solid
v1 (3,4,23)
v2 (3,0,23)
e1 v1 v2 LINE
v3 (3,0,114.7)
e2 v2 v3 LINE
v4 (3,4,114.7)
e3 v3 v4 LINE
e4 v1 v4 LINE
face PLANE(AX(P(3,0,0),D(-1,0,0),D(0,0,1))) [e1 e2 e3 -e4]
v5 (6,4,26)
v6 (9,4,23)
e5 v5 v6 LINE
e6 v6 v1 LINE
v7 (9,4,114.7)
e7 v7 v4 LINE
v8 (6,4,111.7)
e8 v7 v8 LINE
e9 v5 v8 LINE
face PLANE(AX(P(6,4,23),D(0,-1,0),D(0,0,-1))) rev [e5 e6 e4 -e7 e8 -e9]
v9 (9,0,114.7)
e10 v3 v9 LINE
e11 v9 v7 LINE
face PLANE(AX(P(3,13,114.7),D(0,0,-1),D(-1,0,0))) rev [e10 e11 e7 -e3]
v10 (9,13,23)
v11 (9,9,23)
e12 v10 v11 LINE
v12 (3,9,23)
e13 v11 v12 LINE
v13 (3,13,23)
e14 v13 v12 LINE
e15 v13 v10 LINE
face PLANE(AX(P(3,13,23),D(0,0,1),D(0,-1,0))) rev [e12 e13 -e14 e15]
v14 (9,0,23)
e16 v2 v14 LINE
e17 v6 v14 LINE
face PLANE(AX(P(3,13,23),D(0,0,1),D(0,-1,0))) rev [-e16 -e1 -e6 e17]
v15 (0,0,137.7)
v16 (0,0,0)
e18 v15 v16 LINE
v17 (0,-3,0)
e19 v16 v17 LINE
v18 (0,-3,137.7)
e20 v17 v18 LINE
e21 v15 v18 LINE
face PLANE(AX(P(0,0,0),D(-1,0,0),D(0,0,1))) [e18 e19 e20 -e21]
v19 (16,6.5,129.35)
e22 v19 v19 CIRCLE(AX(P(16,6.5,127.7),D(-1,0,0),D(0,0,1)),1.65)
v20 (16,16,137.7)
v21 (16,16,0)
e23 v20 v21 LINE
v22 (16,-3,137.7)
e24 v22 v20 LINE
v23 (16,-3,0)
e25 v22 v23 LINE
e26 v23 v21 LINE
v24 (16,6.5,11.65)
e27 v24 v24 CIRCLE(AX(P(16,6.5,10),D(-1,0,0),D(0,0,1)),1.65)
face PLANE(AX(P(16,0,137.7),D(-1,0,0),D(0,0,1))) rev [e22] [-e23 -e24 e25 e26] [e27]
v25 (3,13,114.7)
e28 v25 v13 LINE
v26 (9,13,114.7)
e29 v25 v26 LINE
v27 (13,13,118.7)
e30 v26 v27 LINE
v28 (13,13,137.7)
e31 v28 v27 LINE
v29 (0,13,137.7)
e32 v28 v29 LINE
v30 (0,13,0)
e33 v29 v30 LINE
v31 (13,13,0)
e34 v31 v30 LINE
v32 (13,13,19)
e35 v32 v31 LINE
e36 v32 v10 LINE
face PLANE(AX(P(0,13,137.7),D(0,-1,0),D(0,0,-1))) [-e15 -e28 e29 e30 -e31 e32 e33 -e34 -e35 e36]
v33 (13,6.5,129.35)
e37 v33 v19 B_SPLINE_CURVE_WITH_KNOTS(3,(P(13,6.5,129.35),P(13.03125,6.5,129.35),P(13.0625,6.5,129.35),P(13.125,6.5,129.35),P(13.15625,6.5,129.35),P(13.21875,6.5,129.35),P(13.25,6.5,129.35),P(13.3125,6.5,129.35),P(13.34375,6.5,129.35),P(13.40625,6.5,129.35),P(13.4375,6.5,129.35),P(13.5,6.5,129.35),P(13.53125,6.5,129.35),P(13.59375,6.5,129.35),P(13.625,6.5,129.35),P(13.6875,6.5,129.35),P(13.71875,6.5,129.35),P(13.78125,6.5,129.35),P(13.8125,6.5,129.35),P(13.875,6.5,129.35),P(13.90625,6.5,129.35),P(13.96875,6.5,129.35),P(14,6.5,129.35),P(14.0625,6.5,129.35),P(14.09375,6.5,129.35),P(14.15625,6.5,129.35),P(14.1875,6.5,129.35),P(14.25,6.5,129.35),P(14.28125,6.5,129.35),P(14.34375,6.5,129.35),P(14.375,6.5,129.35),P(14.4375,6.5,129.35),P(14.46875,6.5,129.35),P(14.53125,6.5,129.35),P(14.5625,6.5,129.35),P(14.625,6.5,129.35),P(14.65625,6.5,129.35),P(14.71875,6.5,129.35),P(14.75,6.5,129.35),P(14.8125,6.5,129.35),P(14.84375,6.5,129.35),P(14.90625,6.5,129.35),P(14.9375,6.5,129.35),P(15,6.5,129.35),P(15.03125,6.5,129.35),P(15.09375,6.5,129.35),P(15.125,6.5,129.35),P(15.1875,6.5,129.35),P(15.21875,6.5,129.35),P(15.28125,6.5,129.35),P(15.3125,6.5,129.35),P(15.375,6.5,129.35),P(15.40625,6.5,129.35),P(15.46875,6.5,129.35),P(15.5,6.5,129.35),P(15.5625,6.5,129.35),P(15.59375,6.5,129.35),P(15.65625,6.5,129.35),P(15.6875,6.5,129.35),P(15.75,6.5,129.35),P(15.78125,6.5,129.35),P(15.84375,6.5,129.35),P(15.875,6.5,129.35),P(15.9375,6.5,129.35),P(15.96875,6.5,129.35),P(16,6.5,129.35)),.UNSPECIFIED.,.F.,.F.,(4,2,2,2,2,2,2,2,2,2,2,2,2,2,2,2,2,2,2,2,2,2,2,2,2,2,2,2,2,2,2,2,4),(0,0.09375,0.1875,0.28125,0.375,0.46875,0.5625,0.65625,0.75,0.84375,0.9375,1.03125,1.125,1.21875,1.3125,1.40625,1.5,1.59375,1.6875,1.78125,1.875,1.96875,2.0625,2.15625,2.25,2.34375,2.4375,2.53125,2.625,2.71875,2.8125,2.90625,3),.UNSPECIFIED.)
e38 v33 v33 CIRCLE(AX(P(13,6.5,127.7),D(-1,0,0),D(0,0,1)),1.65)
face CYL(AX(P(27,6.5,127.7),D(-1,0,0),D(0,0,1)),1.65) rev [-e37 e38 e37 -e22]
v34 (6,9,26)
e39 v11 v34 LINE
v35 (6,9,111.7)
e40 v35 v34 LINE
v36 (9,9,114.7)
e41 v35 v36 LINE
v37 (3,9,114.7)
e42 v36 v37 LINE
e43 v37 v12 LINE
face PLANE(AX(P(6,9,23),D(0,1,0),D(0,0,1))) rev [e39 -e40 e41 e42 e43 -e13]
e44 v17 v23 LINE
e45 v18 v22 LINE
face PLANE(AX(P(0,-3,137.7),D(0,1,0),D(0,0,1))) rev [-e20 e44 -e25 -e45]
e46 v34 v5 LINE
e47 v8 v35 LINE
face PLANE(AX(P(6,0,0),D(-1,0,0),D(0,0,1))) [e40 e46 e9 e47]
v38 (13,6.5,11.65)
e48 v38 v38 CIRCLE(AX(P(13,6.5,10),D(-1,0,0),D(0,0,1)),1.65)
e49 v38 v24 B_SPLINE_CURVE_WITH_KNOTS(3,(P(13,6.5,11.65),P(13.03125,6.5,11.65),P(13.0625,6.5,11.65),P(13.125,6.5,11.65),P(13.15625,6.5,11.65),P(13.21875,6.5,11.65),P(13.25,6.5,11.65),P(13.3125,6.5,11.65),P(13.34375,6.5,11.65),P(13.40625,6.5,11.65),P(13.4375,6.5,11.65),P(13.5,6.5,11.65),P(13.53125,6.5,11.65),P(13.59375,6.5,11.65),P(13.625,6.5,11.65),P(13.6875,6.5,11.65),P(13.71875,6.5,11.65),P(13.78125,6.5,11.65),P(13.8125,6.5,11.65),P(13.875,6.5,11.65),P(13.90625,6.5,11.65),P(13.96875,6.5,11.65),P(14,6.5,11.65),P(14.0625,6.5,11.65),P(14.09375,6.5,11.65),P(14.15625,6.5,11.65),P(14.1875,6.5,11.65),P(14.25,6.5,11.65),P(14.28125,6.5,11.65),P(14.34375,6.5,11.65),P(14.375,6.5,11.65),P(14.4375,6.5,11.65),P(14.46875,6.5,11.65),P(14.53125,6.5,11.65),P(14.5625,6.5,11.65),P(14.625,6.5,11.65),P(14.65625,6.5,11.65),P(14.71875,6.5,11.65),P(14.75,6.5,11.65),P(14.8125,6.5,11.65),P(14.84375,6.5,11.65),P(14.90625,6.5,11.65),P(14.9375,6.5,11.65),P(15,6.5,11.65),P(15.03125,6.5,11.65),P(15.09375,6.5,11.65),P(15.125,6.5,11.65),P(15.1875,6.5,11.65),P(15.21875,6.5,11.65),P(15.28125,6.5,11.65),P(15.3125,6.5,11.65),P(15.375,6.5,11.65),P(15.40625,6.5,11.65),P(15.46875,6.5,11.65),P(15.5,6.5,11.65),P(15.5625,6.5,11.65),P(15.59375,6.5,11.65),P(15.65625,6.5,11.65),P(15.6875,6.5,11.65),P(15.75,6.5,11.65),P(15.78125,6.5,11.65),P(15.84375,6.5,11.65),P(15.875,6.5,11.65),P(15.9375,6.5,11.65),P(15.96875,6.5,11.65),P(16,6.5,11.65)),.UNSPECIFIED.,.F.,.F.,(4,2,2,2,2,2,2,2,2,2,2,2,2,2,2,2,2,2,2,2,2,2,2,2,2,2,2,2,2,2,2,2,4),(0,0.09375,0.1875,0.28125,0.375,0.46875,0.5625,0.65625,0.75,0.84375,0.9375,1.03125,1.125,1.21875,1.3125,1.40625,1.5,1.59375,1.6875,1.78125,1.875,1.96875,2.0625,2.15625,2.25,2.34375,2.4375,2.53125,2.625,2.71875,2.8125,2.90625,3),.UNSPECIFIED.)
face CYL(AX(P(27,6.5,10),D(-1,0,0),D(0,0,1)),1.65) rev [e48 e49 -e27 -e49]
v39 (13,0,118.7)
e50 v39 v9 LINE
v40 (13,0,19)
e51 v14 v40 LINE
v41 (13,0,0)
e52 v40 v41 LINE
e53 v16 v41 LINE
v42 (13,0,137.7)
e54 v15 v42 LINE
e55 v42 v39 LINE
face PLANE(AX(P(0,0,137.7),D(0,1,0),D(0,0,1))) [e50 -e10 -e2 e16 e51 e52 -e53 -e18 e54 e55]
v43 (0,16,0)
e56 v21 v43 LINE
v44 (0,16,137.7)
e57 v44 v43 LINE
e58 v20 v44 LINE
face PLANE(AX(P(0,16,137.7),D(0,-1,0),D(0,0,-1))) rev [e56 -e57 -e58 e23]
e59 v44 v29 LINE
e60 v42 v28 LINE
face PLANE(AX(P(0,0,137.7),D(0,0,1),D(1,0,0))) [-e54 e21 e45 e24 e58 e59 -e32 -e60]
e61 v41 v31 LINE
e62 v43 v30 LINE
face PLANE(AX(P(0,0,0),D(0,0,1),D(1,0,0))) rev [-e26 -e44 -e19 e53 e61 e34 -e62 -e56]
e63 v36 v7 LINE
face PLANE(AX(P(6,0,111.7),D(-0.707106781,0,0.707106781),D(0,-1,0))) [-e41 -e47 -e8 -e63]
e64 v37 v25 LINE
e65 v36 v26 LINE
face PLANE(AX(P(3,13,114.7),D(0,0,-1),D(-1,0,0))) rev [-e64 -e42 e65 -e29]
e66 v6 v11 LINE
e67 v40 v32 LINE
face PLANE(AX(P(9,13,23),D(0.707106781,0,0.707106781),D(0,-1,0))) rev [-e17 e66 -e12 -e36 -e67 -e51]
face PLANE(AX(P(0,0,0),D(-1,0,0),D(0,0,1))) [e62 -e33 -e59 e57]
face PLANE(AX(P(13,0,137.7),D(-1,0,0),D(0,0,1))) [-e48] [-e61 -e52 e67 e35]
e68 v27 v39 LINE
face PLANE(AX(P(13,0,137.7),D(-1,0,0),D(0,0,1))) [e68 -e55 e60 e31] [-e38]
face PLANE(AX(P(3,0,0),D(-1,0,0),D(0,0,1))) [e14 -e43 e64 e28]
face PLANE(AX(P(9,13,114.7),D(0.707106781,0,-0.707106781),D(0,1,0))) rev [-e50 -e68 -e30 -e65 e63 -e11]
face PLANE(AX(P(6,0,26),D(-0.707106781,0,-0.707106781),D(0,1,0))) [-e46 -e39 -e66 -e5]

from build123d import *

# Parameters (mm, degrees)
SKETCH_1_W          = 19
SKETCH_1_H          = 19
SKETCH_1_W_2        = 13
SKETCH_1_H_2        = 13
EXTRUDE_1_DEPTH     = 137.7
SKETCH_2_R          = 1.65
CUT_EXTRUDE_1_DEPTH = 30
SKETCH_3_W          = 184.332972064
SKETCH_3_H          = 39.863215684
CUT_EXTRUDE_2_DEPTH = 3
SKETCH_4_W          = 5
SKETCH_4_H          = 13
EXTRUDE_1_2_DEPTH   = 10
SKETCH_5_W          = 81.7
SKETCH_5_H          = 5
EXTRUDE_2_DEPTH     = 10
SKETCH_6_W          = 91.7
SKETCH_6_H          = 13
EXTRUDE_3_DEPTH     = 10
SKETCH_8_W          = 91.7
SKETCH_8_H          = 5
CUT_EXTRUDE_3_DEPTH = 3
CHAMFER_1_SIZE      = 3
CHAMFER_2_SIZE      = 4


with BuildPart() as part:
    # 草图1 → Extrude 1 (new body)
    with BuildSketch(Plane.XY):
        with Locations((6.5, 6.5)):
            Rectangle(SKETCH_1_W, SKETCH_1_H)
        with Locations((6.5, 6.5)):
            Rectangle(SKETCH_1_W_2, SKETCH_1_H_2, mode=Mode.SUBTRACT)
    extrude(amount=EXTRUDE_1_DEPTH)

    # 草图2 → 切除-拉伸1 (cut)
    with BuildSketch(Plane.ZY.offset(3)):
        with Locations((10, 6.5)):
            Circle(SKETCH_2_R)
        with Locations((127.7, 6.5)):
            Circle(SKETCH_2_R)
    extrude(amount=-CUT_EXTRUDE_1_DEPTH, mode=Mode.SUBTRACT)

    # 草图3 → 切除-拉伸2 (cut)
    with BuildSketch(Plane.ZY.offset(3)):
        with Locations((86.871134348, 3.380889782)):
            Rectangle(SKETCH_3_W, SKETCH_3_H)
    extrude(amount=-CUT_EXTRUDE_2_DEPTH, mode=Mode.SUBTRACT)

    # 草图4 → Extrude 1 2 (add)
    with BuildSketch(Plane.ZY.offset(-13)):
        with Locations((25.5, 6.5)):
            Rectangle(SKETCH_4_W, SKETCH_4_H)
        with Locations((112.2, 6.5)):
            Rectangle(SKETCH_4_W, SKETCH_4_H)
    extrude(amount=EXTRUDE_1_2_DEPTH)

    # 草图5 → 凸台-拉伸2 (add)
    with BuildSketch(Plane.ZY.offset(-13)):
        with Locations((68.85, 6.5)):
            Rectangle(SKETCH_5_W, SKETCH_5_H)
    extrude(amount=EXTRUDE_2_DEPTH)

    # 草图6 → 凸台-拉伸3 (add)
    with BuildSketch(Plane.ZY.offset(-13)):
        with Locations((68.85, 6.5)):
            Rectangle(SKETCH_6_W, SKETCH_6_H)
    extrude(amount=EXTRUDE_3_DEPTH)

    # 草图8 → 切除-拉伸3 (cut)
    with BuildSketch(Plane.ZY.offset(-3)):
        with Locations((68.85, 6.5)):
            Rectangle(SKETCH_8_W, SKETCH_8_H)
    extrude(amount=-CUT_EXTRUDE_3_DEPTH, mode=Mode.SUBTRACT)

    # 倒角1
    chamfer_1_edges = [part.edges().sort_by_distance(p)[0] for p in [
        (6, 6.5, 23),
        (6, 6.5, 114.7),
    ]]
    chamfer(chamfer_1_edges, length=CHAMFER_1_SIZE)

    # 倒角2
    chamfer_2_edges = [part.edges().sort_by_distance(p)[0] for p in [
        (13, 6.5, 23),
        (13, 6.5, 114.7),
    ]]
    chamfer(chamfer_2_edges, length=CHAMFER_2_SIZE - 0.0001)  # a hair under: the kernel refuses the full size


solid = part.part
